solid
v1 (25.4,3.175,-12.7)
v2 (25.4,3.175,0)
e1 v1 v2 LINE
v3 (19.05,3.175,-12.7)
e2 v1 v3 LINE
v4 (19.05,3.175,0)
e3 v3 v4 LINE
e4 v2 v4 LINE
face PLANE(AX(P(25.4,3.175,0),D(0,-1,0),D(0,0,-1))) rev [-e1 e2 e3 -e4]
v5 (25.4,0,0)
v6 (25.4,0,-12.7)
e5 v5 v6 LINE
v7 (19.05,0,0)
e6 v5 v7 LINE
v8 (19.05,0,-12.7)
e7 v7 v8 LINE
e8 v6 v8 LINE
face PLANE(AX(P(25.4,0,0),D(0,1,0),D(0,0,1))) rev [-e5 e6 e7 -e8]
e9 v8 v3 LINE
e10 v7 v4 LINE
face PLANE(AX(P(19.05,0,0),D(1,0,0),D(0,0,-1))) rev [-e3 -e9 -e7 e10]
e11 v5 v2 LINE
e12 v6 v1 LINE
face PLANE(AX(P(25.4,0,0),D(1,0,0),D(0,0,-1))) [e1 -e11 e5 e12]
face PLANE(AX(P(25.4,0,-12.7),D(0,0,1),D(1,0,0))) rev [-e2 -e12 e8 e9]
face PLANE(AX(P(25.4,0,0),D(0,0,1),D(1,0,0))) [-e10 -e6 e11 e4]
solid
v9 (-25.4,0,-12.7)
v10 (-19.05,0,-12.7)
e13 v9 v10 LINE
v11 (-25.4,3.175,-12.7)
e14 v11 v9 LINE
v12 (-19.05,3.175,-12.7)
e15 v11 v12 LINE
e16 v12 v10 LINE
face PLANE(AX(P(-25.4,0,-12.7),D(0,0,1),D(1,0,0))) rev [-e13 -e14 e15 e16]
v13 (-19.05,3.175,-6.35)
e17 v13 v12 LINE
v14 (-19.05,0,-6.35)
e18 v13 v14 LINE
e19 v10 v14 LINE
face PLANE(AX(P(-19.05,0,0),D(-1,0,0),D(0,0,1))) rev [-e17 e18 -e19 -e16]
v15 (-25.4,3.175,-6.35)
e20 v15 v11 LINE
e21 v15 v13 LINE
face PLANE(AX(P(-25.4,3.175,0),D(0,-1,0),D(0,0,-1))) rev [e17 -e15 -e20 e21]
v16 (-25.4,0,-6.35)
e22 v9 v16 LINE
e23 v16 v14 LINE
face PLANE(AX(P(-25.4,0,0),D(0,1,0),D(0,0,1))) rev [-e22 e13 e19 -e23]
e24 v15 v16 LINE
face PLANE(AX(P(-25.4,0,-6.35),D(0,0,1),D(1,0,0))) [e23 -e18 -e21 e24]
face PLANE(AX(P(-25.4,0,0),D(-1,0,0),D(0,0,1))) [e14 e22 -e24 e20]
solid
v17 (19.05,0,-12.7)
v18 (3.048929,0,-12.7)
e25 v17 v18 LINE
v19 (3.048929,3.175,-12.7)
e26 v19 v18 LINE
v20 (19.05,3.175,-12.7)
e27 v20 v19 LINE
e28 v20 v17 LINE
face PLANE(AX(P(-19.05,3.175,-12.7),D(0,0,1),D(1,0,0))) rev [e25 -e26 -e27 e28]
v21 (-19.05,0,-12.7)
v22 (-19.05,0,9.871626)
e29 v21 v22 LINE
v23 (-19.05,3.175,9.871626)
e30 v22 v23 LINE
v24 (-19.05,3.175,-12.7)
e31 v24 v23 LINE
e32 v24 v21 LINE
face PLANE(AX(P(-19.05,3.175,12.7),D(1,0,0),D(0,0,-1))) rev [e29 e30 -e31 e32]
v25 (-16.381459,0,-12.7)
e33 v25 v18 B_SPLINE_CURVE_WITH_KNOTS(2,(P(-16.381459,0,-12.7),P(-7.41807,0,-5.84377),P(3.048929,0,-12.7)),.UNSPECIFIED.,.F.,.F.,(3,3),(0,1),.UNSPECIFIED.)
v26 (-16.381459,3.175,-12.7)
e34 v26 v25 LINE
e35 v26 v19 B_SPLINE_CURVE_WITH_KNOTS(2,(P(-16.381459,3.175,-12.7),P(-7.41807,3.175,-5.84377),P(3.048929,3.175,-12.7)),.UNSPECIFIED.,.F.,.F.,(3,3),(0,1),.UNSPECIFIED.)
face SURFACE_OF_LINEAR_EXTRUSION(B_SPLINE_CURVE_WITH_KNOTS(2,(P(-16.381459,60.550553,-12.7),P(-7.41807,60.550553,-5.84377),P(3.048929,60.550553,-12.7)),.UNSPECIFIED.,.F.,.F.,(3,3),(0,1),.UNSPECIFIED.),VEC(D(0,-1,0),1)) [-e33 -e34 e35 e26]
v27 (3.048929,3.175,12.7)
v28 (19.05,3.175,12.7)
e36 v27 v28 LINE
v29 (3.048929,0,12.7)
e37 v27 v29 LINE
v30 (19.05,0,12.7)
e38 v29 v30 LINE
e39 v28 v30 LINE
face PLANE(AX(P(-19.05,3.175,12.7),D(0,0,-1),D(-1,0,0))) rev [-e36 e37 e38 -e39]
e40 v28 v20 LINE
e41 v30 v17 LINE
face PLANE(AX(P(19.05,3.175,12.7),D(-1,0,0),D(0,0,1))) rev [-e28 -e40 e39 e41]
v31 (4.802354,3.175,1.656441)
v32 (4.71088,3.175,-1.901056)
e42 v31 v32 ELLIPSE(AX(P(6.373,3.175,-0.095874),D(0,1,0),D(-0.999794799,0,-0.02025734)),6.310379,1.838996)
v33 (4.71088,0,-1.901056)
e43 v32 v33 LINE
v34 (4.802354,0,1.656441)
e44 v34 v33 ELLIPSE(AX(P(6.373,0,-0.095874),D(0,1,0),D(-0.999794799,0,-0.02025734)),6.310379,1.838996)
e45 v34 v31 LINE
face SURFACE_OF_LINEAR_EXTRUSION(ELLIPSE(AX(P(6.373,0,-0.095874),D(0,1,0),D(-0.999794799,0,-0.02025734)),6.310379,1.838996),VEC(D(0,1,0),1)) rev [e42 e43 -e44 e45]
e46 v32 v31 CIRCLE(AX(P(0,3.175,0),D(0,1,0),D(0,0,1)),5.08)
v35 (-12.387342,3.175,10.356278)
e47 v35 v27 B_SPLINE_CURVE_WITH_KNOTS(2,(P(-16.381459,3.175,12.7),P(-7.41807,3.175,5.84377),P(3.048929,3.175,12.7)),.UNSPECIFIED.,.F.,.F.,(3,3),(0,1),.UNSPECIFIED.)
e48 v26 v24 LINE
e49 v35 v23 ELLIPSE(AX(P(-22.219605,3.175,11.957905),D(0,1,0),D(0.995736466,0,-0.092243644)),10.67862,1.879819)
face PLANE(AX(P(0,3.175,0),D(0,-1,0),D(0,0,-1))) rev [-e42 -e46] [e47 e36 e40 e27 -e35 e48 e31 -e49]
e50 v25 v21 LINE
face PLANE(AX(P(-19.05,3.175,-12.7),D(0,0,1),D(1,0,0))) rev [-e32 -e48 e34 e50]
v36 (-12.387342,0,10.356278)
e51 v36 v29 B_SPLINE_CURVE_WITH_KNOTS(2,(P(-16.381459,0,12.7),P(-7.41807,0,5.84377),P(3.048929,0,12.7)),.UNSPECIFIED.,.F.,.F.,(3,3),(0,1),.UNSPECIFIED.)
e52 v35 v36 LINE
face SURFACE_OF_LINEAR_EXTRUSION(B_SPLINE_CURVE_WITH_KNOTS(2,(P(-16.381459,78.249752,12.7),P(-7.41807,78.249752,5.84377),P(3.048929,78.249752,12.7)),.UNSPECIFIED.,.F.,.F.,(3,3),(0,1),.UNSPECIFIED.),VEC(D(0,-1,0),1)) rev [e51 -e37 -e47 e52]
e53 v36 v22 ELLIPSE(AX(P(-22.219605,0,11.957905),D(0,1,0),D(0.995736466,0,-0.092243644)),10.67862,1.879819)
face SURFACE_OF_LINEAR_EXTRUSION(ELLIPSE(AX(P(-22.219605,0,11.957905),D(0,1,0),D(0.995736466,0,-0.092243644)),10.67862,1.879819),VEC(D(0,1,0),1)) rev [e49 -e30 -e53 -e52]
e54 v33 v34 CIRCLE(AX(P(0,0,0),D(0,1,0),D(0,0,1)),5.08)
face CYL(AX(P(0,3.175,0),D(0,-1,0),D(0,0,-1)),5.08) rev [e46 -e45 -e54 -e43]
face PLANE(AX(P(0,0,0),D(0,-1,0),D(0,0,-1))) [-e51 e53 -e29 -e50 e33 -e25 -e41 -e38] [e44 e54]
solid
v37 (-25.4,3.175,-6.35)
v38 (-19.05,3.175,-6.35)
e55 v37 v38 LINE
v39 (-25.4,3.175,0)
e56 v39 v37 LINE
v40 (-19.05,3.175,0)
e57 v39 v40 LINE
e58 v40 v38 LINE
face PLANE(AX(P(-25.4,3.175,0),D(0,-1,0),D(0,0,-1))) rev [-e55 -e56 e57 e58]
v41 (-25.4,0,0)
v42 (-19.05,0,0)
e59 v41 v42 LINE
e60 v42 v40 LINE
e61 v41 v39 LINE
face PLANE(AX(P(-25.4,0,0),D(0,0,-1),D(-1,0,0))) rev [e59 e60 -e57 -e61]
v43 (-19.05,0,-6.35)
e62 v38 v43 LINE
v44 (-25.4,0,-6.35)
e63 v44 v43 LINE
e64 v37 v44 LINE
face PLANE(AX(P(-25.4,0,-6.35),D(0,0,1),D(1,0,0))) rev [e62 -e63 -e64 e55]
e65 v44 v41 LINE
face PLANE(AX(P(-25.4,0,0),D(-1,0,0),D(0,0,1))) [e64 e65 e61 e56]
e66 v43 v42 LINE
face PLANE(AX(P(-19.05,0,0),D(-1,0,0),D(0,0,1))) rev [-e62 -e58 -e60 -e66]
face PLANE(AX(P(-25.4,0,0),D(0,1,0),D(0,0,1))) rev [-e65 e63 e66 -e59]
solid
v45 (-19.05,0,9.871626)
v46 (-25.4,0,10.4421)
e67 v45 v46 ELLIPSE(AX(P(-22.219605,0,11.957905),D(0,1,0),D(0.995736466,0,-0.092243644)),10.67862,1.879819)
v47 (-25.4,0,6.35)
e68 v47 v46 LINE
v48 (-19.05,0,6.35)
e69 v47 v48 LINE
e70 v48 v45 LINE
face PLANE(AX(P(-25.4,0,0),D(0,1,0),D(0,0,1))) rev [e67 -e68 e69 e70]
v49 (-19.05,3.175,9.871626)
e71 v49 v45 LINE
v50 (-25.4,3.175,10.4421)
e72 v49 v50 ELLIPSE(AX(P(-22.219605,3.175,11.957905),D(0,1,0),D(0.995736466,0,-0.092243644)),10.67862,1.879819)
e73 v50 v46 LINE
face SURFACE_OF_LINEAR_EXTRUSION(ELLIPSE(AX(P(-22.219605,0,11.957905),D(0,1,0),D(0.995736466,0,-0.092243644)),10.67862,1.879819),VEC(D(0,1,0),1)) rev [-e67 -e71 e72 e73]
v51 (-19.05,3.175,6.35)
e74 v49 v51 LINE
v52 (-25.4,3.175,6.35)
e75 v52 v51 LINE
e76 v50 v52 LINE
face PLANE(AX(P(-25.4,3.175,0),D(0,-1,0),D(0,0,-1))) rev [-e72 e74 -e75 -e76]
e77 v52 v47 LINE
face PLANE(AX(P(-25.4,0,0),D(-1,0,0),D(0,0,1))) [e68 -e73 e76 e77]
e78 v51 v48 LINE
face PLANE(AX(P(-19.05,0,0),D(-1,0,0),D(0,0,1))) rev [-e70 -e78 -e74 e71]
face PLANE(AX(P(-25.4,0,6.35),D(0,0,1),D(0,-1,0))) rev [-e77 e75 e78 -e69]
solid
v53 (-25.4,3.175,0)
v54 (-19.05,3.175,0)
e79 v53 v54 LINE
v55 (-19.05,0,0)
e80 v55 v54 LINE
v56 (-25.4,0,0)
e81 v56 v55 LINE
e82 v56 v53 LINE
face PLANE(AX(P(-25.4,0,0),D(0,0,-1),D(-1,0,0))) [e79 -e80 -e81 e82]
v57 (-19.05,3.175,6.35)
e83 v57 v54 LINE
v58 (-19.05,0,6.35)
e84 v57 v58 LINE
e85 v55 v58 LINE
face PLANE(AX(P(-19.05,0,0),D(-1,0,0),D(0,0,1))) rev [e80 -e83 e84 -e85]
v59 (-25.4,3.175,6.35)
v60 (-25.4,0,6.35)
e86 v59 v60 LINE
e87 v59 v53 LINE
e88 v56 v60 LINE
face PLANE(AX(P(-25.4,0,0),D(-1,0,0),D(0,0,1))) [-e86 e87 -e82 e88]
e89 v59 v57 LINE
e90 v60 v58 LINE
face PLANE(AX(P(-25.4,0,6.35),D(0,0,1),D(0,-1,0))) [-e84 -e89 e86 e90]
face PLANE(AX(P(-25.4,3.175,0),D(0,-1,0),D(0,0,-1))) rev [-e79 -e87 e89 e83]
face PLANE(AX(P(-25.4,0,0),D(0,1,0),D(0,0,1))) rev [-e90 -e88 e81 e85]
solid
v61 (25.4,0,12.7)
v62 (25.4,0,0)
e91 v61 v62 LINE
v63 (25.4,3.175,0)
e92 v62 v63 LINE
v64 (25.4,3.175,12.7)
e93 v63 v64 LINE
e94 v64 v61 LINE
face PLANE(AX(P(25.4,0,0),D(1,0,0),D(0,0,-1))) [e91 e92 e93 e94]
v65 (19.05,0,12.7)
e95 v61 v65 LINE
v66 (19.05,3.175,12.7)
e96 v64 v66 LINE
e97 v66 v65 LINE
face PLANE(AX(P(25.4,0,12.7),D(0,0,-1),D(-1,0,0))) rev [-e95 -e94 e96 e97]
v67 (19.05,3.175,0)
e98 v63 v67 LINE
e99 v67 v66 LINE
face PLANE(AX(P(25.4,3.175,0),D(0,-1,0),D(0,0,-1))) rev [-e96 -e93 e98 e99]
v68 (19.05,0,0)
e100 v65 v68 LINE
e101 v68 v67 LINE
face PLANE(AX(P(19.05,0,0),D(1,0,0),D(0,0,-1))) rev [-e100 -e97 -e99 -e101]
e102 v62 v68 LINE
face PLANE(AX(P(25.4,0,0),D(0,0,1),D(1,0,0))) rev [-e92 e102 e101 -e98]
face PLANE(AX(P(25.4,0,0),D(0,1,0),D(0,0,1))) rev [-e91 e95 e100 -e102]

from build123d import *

# Parameters (mm, degrees)
SKETCH1_W           = 38.1
SKETCH1_H           = 25.4
SKETCH1_R           = 5.08
BOSS_EXTRUDE1_DEPTH = 3.175
SKETCH2_W           = 6.35
SKETCH2_H           = 3.175
BOSS_EXTRUDE3_DEPTH = 6.35
SKETCH2_4_W         = 6.35
SKETCH2_4_H         = 3.175
BOSS_EXTRUDE4_DEPTH = 6.35
SKETCH2_6_W         = 6.35
SKETCH2_6_H         = 3.175
BOSS_EXTRUDE6_DEPTH = 6.35
SKETCH2_7_W         = 6.35
SKETCH2_7_H         = 3.175
BOSS_EXTRUDE7_DEPTH = 6.35
SKETCH4_W           = 12.7
SKETCH4_H           = 3.175
BOSS_EXTRUDE8_DEPTH = 6.35
SKETCH4_3_W         = 12.7
SKETCH4_3_H         = 3.175
BOSS_EXTRUDE9_DEPTH = 6.35
CUT_EXTRUDE2_START  = -3.175
CUT_EXTRUDE2_DEPTH  = 3.175
SKETCH8_RX          = 10.678619867
SKETCH8_RY          = 1.879818627
CUT_EXTRUDE3_DEPTH  = 29.575000056
SKETCH9_RX          = 6.310379454
SKETCH9_RY          = 1.838996288
CUT_EXTRUDE4_DEPTH  = 29.575000211


# Read off the part's stored shape, not the designer's step: Cut-Extrude2
with BuildPart() as part:
    # Sketch1 → Boss-Extrude1 (new body)
    with BuildSketch(Plane(origin=(0, 0, 0), x_dir=(1, 0, 0), z_dir=(0, 1, 0))):
        Rectangle(SKETCH1_W, SKETCH1_H)
        with Locations(Location((0, 0, 0), (0, 0, 270))):
            Circle(SKETCH1_R, mode=Mode.SUBTRACT)
    extrude(amount=BOSS_EXTRUDE1_DEPTH)

    # Cut-Extrude2 outline → Cut-Extrude2 (cut)
    with BuildSketch(Plane(origin=(0, 3.175, 0), x_dir=(1, 0, 0), z_dir=(0, 1, 0)).offset(CUT_EXTRUDE2_START)):
        with BuildLine():
            add(Edge.make_bspline(
                [(-16.381459426, -12.7), (-7.418069757, -5.843770377), (3.048928821, -12.7)],
                knots=[0, 0, 0, 1, 1, 1], degree=2))
            Line((-16.381459426, -12.7), (3.048928821, -12.7))
        make_face()
    cut_extrude2 = extrude(amount=CUT_EXTRUDE2_DEPTH, mode=Mode.SUBTRACT)

    # Mirror1: Cut-Extrude2 across plane
    add(cut_extrude2.mirror(Plane.XY), mode=Mode.SUBTRACT)


with BuildPart() as body_2:
    # Sketch2 → Boss-Extrude3 (new body)
    with BuildSketch(Plane.ZY.offset(19.05)):
        with Locations((-9.525, 1.5875)):
            Rectangle(SKETCH2_W, SKETCH2_H)
    extrude(amount=BOSS_EXTRUDE3_DEPTH)


with BuildPart() as body_3:
    # Sketch2<4> → Boss-Extrude4 (new body)
    with BuildSketch(Plane.ZY.offset(19.05)):
        with Locations((-3.175, 1.5875)):
            Rectangle(SKETCH2_4_W, SKETCH2_4_H)
    extrude(amount=BOSS_EXTRUDE4_DEPTH)


with BuildPart() as body_4:
    # Sketch2<6> → Boss-Extrude6 (new body)
    with BuildSketch(Plane.ZY.offset(19.05)):
        with Locations((3.175, 1.5875)):
            Rectangle(SKETCH2_6_W, SKETCH2_6_H)
    extrude(amount=BOSS_EXTRUDE6_DEPTH)


with BuildPart() as body_5:
    # Sketch2<7> → Boss-Extrude7 (new body)
    with BuildSketch(Plane.ZY.offset(19.05)):
        with Locations((9.525, 1.5875)):
            Rectangle(SKETCH2_7_W, SKETCH2_7_H)
    extrude(amount=BOSS_EXTRUDE7_DEPTH)


with BuildPart() as body_6:
    # Sketch4 → Boss-Extrude8 (new body)
    with BuildSketch(Plane(origin=(19.05, 0, 0), x_dir=(0, 0, -1), z_dir=(1, 0, 0))):
        with Locations((-6.35, 1.5875)):
            Rectangle(SKETCH4_W, SKETCH4_H)
    extrude(amount=BOSS_EXTRUDE8_DEPTH)


with BuildPart() as body_7:
    # Sketch4<3> → Boss-Extrude9 (new body)
    with BuildSketch(Plane(origin=(19.05, 0, 0), x_dir=(0, 0, -1), z_dir=(1, 0, 0))):
        with Locations((6.35, 1.5875)):
            Rectangle(SKETCH4_3_W, SKETCH4_3_H)
    extrude(amount=BOSS_EXTRUDE9_DEPTH)


with BuildPart() as cut_extrude3_tool:
    # Sketch8 → Cut-Extrude3 (new, through all)
    with BuildSketch(Plane(origin=(0, 3.175, 0), x_dir=(1, 0, 0), z_dir=(0, 1, 0))):
        with Locations(Location((-22.219604707, -11.957904728), (0, 0, 5.292695502))):
            Ellipse(SKETCH8_RX, SKETCH8_RY)
    extrude(amount=-CUT_EXTRUDE3_DEPTH)


with BuildPart() as part_1:
    add(part.part)

    # Cut-Extrude3: cut by cut_extrude3_tool
    add(cut_extrude3_tool.part, mode=Mode.SUBTRACT)

    # Sketch9 → Cut-Extrude4 (cut, through all)
    with BuildSketch(Plane(origin=(0, 3.175, 0), x_dir=(1, 0, 0), z_dir=(0, 1, 0))):
        with Locations(Location((6.373000309, 0.095873626), (0, 0, 178.839260522))):
            Ellipse(SKETCH9_RX, SKETCH9_RY)
    extrude(amount=-CUT_EXTRUDE4_DEPTH, mode=Mode.SUBTRACT)


with BuildPart() as body_5_1:
    add(body_5.part)

    # Cut-Extrude3: cut by cut_extrude3_tool
    add(cut_extrude3_tool.part, mode=Mode.SUBTRACT)


solid = Compound([body_2.part, body_3.part, body_4.part, body_6.part, body_7.part, part_1.part, body_5_1.part])
